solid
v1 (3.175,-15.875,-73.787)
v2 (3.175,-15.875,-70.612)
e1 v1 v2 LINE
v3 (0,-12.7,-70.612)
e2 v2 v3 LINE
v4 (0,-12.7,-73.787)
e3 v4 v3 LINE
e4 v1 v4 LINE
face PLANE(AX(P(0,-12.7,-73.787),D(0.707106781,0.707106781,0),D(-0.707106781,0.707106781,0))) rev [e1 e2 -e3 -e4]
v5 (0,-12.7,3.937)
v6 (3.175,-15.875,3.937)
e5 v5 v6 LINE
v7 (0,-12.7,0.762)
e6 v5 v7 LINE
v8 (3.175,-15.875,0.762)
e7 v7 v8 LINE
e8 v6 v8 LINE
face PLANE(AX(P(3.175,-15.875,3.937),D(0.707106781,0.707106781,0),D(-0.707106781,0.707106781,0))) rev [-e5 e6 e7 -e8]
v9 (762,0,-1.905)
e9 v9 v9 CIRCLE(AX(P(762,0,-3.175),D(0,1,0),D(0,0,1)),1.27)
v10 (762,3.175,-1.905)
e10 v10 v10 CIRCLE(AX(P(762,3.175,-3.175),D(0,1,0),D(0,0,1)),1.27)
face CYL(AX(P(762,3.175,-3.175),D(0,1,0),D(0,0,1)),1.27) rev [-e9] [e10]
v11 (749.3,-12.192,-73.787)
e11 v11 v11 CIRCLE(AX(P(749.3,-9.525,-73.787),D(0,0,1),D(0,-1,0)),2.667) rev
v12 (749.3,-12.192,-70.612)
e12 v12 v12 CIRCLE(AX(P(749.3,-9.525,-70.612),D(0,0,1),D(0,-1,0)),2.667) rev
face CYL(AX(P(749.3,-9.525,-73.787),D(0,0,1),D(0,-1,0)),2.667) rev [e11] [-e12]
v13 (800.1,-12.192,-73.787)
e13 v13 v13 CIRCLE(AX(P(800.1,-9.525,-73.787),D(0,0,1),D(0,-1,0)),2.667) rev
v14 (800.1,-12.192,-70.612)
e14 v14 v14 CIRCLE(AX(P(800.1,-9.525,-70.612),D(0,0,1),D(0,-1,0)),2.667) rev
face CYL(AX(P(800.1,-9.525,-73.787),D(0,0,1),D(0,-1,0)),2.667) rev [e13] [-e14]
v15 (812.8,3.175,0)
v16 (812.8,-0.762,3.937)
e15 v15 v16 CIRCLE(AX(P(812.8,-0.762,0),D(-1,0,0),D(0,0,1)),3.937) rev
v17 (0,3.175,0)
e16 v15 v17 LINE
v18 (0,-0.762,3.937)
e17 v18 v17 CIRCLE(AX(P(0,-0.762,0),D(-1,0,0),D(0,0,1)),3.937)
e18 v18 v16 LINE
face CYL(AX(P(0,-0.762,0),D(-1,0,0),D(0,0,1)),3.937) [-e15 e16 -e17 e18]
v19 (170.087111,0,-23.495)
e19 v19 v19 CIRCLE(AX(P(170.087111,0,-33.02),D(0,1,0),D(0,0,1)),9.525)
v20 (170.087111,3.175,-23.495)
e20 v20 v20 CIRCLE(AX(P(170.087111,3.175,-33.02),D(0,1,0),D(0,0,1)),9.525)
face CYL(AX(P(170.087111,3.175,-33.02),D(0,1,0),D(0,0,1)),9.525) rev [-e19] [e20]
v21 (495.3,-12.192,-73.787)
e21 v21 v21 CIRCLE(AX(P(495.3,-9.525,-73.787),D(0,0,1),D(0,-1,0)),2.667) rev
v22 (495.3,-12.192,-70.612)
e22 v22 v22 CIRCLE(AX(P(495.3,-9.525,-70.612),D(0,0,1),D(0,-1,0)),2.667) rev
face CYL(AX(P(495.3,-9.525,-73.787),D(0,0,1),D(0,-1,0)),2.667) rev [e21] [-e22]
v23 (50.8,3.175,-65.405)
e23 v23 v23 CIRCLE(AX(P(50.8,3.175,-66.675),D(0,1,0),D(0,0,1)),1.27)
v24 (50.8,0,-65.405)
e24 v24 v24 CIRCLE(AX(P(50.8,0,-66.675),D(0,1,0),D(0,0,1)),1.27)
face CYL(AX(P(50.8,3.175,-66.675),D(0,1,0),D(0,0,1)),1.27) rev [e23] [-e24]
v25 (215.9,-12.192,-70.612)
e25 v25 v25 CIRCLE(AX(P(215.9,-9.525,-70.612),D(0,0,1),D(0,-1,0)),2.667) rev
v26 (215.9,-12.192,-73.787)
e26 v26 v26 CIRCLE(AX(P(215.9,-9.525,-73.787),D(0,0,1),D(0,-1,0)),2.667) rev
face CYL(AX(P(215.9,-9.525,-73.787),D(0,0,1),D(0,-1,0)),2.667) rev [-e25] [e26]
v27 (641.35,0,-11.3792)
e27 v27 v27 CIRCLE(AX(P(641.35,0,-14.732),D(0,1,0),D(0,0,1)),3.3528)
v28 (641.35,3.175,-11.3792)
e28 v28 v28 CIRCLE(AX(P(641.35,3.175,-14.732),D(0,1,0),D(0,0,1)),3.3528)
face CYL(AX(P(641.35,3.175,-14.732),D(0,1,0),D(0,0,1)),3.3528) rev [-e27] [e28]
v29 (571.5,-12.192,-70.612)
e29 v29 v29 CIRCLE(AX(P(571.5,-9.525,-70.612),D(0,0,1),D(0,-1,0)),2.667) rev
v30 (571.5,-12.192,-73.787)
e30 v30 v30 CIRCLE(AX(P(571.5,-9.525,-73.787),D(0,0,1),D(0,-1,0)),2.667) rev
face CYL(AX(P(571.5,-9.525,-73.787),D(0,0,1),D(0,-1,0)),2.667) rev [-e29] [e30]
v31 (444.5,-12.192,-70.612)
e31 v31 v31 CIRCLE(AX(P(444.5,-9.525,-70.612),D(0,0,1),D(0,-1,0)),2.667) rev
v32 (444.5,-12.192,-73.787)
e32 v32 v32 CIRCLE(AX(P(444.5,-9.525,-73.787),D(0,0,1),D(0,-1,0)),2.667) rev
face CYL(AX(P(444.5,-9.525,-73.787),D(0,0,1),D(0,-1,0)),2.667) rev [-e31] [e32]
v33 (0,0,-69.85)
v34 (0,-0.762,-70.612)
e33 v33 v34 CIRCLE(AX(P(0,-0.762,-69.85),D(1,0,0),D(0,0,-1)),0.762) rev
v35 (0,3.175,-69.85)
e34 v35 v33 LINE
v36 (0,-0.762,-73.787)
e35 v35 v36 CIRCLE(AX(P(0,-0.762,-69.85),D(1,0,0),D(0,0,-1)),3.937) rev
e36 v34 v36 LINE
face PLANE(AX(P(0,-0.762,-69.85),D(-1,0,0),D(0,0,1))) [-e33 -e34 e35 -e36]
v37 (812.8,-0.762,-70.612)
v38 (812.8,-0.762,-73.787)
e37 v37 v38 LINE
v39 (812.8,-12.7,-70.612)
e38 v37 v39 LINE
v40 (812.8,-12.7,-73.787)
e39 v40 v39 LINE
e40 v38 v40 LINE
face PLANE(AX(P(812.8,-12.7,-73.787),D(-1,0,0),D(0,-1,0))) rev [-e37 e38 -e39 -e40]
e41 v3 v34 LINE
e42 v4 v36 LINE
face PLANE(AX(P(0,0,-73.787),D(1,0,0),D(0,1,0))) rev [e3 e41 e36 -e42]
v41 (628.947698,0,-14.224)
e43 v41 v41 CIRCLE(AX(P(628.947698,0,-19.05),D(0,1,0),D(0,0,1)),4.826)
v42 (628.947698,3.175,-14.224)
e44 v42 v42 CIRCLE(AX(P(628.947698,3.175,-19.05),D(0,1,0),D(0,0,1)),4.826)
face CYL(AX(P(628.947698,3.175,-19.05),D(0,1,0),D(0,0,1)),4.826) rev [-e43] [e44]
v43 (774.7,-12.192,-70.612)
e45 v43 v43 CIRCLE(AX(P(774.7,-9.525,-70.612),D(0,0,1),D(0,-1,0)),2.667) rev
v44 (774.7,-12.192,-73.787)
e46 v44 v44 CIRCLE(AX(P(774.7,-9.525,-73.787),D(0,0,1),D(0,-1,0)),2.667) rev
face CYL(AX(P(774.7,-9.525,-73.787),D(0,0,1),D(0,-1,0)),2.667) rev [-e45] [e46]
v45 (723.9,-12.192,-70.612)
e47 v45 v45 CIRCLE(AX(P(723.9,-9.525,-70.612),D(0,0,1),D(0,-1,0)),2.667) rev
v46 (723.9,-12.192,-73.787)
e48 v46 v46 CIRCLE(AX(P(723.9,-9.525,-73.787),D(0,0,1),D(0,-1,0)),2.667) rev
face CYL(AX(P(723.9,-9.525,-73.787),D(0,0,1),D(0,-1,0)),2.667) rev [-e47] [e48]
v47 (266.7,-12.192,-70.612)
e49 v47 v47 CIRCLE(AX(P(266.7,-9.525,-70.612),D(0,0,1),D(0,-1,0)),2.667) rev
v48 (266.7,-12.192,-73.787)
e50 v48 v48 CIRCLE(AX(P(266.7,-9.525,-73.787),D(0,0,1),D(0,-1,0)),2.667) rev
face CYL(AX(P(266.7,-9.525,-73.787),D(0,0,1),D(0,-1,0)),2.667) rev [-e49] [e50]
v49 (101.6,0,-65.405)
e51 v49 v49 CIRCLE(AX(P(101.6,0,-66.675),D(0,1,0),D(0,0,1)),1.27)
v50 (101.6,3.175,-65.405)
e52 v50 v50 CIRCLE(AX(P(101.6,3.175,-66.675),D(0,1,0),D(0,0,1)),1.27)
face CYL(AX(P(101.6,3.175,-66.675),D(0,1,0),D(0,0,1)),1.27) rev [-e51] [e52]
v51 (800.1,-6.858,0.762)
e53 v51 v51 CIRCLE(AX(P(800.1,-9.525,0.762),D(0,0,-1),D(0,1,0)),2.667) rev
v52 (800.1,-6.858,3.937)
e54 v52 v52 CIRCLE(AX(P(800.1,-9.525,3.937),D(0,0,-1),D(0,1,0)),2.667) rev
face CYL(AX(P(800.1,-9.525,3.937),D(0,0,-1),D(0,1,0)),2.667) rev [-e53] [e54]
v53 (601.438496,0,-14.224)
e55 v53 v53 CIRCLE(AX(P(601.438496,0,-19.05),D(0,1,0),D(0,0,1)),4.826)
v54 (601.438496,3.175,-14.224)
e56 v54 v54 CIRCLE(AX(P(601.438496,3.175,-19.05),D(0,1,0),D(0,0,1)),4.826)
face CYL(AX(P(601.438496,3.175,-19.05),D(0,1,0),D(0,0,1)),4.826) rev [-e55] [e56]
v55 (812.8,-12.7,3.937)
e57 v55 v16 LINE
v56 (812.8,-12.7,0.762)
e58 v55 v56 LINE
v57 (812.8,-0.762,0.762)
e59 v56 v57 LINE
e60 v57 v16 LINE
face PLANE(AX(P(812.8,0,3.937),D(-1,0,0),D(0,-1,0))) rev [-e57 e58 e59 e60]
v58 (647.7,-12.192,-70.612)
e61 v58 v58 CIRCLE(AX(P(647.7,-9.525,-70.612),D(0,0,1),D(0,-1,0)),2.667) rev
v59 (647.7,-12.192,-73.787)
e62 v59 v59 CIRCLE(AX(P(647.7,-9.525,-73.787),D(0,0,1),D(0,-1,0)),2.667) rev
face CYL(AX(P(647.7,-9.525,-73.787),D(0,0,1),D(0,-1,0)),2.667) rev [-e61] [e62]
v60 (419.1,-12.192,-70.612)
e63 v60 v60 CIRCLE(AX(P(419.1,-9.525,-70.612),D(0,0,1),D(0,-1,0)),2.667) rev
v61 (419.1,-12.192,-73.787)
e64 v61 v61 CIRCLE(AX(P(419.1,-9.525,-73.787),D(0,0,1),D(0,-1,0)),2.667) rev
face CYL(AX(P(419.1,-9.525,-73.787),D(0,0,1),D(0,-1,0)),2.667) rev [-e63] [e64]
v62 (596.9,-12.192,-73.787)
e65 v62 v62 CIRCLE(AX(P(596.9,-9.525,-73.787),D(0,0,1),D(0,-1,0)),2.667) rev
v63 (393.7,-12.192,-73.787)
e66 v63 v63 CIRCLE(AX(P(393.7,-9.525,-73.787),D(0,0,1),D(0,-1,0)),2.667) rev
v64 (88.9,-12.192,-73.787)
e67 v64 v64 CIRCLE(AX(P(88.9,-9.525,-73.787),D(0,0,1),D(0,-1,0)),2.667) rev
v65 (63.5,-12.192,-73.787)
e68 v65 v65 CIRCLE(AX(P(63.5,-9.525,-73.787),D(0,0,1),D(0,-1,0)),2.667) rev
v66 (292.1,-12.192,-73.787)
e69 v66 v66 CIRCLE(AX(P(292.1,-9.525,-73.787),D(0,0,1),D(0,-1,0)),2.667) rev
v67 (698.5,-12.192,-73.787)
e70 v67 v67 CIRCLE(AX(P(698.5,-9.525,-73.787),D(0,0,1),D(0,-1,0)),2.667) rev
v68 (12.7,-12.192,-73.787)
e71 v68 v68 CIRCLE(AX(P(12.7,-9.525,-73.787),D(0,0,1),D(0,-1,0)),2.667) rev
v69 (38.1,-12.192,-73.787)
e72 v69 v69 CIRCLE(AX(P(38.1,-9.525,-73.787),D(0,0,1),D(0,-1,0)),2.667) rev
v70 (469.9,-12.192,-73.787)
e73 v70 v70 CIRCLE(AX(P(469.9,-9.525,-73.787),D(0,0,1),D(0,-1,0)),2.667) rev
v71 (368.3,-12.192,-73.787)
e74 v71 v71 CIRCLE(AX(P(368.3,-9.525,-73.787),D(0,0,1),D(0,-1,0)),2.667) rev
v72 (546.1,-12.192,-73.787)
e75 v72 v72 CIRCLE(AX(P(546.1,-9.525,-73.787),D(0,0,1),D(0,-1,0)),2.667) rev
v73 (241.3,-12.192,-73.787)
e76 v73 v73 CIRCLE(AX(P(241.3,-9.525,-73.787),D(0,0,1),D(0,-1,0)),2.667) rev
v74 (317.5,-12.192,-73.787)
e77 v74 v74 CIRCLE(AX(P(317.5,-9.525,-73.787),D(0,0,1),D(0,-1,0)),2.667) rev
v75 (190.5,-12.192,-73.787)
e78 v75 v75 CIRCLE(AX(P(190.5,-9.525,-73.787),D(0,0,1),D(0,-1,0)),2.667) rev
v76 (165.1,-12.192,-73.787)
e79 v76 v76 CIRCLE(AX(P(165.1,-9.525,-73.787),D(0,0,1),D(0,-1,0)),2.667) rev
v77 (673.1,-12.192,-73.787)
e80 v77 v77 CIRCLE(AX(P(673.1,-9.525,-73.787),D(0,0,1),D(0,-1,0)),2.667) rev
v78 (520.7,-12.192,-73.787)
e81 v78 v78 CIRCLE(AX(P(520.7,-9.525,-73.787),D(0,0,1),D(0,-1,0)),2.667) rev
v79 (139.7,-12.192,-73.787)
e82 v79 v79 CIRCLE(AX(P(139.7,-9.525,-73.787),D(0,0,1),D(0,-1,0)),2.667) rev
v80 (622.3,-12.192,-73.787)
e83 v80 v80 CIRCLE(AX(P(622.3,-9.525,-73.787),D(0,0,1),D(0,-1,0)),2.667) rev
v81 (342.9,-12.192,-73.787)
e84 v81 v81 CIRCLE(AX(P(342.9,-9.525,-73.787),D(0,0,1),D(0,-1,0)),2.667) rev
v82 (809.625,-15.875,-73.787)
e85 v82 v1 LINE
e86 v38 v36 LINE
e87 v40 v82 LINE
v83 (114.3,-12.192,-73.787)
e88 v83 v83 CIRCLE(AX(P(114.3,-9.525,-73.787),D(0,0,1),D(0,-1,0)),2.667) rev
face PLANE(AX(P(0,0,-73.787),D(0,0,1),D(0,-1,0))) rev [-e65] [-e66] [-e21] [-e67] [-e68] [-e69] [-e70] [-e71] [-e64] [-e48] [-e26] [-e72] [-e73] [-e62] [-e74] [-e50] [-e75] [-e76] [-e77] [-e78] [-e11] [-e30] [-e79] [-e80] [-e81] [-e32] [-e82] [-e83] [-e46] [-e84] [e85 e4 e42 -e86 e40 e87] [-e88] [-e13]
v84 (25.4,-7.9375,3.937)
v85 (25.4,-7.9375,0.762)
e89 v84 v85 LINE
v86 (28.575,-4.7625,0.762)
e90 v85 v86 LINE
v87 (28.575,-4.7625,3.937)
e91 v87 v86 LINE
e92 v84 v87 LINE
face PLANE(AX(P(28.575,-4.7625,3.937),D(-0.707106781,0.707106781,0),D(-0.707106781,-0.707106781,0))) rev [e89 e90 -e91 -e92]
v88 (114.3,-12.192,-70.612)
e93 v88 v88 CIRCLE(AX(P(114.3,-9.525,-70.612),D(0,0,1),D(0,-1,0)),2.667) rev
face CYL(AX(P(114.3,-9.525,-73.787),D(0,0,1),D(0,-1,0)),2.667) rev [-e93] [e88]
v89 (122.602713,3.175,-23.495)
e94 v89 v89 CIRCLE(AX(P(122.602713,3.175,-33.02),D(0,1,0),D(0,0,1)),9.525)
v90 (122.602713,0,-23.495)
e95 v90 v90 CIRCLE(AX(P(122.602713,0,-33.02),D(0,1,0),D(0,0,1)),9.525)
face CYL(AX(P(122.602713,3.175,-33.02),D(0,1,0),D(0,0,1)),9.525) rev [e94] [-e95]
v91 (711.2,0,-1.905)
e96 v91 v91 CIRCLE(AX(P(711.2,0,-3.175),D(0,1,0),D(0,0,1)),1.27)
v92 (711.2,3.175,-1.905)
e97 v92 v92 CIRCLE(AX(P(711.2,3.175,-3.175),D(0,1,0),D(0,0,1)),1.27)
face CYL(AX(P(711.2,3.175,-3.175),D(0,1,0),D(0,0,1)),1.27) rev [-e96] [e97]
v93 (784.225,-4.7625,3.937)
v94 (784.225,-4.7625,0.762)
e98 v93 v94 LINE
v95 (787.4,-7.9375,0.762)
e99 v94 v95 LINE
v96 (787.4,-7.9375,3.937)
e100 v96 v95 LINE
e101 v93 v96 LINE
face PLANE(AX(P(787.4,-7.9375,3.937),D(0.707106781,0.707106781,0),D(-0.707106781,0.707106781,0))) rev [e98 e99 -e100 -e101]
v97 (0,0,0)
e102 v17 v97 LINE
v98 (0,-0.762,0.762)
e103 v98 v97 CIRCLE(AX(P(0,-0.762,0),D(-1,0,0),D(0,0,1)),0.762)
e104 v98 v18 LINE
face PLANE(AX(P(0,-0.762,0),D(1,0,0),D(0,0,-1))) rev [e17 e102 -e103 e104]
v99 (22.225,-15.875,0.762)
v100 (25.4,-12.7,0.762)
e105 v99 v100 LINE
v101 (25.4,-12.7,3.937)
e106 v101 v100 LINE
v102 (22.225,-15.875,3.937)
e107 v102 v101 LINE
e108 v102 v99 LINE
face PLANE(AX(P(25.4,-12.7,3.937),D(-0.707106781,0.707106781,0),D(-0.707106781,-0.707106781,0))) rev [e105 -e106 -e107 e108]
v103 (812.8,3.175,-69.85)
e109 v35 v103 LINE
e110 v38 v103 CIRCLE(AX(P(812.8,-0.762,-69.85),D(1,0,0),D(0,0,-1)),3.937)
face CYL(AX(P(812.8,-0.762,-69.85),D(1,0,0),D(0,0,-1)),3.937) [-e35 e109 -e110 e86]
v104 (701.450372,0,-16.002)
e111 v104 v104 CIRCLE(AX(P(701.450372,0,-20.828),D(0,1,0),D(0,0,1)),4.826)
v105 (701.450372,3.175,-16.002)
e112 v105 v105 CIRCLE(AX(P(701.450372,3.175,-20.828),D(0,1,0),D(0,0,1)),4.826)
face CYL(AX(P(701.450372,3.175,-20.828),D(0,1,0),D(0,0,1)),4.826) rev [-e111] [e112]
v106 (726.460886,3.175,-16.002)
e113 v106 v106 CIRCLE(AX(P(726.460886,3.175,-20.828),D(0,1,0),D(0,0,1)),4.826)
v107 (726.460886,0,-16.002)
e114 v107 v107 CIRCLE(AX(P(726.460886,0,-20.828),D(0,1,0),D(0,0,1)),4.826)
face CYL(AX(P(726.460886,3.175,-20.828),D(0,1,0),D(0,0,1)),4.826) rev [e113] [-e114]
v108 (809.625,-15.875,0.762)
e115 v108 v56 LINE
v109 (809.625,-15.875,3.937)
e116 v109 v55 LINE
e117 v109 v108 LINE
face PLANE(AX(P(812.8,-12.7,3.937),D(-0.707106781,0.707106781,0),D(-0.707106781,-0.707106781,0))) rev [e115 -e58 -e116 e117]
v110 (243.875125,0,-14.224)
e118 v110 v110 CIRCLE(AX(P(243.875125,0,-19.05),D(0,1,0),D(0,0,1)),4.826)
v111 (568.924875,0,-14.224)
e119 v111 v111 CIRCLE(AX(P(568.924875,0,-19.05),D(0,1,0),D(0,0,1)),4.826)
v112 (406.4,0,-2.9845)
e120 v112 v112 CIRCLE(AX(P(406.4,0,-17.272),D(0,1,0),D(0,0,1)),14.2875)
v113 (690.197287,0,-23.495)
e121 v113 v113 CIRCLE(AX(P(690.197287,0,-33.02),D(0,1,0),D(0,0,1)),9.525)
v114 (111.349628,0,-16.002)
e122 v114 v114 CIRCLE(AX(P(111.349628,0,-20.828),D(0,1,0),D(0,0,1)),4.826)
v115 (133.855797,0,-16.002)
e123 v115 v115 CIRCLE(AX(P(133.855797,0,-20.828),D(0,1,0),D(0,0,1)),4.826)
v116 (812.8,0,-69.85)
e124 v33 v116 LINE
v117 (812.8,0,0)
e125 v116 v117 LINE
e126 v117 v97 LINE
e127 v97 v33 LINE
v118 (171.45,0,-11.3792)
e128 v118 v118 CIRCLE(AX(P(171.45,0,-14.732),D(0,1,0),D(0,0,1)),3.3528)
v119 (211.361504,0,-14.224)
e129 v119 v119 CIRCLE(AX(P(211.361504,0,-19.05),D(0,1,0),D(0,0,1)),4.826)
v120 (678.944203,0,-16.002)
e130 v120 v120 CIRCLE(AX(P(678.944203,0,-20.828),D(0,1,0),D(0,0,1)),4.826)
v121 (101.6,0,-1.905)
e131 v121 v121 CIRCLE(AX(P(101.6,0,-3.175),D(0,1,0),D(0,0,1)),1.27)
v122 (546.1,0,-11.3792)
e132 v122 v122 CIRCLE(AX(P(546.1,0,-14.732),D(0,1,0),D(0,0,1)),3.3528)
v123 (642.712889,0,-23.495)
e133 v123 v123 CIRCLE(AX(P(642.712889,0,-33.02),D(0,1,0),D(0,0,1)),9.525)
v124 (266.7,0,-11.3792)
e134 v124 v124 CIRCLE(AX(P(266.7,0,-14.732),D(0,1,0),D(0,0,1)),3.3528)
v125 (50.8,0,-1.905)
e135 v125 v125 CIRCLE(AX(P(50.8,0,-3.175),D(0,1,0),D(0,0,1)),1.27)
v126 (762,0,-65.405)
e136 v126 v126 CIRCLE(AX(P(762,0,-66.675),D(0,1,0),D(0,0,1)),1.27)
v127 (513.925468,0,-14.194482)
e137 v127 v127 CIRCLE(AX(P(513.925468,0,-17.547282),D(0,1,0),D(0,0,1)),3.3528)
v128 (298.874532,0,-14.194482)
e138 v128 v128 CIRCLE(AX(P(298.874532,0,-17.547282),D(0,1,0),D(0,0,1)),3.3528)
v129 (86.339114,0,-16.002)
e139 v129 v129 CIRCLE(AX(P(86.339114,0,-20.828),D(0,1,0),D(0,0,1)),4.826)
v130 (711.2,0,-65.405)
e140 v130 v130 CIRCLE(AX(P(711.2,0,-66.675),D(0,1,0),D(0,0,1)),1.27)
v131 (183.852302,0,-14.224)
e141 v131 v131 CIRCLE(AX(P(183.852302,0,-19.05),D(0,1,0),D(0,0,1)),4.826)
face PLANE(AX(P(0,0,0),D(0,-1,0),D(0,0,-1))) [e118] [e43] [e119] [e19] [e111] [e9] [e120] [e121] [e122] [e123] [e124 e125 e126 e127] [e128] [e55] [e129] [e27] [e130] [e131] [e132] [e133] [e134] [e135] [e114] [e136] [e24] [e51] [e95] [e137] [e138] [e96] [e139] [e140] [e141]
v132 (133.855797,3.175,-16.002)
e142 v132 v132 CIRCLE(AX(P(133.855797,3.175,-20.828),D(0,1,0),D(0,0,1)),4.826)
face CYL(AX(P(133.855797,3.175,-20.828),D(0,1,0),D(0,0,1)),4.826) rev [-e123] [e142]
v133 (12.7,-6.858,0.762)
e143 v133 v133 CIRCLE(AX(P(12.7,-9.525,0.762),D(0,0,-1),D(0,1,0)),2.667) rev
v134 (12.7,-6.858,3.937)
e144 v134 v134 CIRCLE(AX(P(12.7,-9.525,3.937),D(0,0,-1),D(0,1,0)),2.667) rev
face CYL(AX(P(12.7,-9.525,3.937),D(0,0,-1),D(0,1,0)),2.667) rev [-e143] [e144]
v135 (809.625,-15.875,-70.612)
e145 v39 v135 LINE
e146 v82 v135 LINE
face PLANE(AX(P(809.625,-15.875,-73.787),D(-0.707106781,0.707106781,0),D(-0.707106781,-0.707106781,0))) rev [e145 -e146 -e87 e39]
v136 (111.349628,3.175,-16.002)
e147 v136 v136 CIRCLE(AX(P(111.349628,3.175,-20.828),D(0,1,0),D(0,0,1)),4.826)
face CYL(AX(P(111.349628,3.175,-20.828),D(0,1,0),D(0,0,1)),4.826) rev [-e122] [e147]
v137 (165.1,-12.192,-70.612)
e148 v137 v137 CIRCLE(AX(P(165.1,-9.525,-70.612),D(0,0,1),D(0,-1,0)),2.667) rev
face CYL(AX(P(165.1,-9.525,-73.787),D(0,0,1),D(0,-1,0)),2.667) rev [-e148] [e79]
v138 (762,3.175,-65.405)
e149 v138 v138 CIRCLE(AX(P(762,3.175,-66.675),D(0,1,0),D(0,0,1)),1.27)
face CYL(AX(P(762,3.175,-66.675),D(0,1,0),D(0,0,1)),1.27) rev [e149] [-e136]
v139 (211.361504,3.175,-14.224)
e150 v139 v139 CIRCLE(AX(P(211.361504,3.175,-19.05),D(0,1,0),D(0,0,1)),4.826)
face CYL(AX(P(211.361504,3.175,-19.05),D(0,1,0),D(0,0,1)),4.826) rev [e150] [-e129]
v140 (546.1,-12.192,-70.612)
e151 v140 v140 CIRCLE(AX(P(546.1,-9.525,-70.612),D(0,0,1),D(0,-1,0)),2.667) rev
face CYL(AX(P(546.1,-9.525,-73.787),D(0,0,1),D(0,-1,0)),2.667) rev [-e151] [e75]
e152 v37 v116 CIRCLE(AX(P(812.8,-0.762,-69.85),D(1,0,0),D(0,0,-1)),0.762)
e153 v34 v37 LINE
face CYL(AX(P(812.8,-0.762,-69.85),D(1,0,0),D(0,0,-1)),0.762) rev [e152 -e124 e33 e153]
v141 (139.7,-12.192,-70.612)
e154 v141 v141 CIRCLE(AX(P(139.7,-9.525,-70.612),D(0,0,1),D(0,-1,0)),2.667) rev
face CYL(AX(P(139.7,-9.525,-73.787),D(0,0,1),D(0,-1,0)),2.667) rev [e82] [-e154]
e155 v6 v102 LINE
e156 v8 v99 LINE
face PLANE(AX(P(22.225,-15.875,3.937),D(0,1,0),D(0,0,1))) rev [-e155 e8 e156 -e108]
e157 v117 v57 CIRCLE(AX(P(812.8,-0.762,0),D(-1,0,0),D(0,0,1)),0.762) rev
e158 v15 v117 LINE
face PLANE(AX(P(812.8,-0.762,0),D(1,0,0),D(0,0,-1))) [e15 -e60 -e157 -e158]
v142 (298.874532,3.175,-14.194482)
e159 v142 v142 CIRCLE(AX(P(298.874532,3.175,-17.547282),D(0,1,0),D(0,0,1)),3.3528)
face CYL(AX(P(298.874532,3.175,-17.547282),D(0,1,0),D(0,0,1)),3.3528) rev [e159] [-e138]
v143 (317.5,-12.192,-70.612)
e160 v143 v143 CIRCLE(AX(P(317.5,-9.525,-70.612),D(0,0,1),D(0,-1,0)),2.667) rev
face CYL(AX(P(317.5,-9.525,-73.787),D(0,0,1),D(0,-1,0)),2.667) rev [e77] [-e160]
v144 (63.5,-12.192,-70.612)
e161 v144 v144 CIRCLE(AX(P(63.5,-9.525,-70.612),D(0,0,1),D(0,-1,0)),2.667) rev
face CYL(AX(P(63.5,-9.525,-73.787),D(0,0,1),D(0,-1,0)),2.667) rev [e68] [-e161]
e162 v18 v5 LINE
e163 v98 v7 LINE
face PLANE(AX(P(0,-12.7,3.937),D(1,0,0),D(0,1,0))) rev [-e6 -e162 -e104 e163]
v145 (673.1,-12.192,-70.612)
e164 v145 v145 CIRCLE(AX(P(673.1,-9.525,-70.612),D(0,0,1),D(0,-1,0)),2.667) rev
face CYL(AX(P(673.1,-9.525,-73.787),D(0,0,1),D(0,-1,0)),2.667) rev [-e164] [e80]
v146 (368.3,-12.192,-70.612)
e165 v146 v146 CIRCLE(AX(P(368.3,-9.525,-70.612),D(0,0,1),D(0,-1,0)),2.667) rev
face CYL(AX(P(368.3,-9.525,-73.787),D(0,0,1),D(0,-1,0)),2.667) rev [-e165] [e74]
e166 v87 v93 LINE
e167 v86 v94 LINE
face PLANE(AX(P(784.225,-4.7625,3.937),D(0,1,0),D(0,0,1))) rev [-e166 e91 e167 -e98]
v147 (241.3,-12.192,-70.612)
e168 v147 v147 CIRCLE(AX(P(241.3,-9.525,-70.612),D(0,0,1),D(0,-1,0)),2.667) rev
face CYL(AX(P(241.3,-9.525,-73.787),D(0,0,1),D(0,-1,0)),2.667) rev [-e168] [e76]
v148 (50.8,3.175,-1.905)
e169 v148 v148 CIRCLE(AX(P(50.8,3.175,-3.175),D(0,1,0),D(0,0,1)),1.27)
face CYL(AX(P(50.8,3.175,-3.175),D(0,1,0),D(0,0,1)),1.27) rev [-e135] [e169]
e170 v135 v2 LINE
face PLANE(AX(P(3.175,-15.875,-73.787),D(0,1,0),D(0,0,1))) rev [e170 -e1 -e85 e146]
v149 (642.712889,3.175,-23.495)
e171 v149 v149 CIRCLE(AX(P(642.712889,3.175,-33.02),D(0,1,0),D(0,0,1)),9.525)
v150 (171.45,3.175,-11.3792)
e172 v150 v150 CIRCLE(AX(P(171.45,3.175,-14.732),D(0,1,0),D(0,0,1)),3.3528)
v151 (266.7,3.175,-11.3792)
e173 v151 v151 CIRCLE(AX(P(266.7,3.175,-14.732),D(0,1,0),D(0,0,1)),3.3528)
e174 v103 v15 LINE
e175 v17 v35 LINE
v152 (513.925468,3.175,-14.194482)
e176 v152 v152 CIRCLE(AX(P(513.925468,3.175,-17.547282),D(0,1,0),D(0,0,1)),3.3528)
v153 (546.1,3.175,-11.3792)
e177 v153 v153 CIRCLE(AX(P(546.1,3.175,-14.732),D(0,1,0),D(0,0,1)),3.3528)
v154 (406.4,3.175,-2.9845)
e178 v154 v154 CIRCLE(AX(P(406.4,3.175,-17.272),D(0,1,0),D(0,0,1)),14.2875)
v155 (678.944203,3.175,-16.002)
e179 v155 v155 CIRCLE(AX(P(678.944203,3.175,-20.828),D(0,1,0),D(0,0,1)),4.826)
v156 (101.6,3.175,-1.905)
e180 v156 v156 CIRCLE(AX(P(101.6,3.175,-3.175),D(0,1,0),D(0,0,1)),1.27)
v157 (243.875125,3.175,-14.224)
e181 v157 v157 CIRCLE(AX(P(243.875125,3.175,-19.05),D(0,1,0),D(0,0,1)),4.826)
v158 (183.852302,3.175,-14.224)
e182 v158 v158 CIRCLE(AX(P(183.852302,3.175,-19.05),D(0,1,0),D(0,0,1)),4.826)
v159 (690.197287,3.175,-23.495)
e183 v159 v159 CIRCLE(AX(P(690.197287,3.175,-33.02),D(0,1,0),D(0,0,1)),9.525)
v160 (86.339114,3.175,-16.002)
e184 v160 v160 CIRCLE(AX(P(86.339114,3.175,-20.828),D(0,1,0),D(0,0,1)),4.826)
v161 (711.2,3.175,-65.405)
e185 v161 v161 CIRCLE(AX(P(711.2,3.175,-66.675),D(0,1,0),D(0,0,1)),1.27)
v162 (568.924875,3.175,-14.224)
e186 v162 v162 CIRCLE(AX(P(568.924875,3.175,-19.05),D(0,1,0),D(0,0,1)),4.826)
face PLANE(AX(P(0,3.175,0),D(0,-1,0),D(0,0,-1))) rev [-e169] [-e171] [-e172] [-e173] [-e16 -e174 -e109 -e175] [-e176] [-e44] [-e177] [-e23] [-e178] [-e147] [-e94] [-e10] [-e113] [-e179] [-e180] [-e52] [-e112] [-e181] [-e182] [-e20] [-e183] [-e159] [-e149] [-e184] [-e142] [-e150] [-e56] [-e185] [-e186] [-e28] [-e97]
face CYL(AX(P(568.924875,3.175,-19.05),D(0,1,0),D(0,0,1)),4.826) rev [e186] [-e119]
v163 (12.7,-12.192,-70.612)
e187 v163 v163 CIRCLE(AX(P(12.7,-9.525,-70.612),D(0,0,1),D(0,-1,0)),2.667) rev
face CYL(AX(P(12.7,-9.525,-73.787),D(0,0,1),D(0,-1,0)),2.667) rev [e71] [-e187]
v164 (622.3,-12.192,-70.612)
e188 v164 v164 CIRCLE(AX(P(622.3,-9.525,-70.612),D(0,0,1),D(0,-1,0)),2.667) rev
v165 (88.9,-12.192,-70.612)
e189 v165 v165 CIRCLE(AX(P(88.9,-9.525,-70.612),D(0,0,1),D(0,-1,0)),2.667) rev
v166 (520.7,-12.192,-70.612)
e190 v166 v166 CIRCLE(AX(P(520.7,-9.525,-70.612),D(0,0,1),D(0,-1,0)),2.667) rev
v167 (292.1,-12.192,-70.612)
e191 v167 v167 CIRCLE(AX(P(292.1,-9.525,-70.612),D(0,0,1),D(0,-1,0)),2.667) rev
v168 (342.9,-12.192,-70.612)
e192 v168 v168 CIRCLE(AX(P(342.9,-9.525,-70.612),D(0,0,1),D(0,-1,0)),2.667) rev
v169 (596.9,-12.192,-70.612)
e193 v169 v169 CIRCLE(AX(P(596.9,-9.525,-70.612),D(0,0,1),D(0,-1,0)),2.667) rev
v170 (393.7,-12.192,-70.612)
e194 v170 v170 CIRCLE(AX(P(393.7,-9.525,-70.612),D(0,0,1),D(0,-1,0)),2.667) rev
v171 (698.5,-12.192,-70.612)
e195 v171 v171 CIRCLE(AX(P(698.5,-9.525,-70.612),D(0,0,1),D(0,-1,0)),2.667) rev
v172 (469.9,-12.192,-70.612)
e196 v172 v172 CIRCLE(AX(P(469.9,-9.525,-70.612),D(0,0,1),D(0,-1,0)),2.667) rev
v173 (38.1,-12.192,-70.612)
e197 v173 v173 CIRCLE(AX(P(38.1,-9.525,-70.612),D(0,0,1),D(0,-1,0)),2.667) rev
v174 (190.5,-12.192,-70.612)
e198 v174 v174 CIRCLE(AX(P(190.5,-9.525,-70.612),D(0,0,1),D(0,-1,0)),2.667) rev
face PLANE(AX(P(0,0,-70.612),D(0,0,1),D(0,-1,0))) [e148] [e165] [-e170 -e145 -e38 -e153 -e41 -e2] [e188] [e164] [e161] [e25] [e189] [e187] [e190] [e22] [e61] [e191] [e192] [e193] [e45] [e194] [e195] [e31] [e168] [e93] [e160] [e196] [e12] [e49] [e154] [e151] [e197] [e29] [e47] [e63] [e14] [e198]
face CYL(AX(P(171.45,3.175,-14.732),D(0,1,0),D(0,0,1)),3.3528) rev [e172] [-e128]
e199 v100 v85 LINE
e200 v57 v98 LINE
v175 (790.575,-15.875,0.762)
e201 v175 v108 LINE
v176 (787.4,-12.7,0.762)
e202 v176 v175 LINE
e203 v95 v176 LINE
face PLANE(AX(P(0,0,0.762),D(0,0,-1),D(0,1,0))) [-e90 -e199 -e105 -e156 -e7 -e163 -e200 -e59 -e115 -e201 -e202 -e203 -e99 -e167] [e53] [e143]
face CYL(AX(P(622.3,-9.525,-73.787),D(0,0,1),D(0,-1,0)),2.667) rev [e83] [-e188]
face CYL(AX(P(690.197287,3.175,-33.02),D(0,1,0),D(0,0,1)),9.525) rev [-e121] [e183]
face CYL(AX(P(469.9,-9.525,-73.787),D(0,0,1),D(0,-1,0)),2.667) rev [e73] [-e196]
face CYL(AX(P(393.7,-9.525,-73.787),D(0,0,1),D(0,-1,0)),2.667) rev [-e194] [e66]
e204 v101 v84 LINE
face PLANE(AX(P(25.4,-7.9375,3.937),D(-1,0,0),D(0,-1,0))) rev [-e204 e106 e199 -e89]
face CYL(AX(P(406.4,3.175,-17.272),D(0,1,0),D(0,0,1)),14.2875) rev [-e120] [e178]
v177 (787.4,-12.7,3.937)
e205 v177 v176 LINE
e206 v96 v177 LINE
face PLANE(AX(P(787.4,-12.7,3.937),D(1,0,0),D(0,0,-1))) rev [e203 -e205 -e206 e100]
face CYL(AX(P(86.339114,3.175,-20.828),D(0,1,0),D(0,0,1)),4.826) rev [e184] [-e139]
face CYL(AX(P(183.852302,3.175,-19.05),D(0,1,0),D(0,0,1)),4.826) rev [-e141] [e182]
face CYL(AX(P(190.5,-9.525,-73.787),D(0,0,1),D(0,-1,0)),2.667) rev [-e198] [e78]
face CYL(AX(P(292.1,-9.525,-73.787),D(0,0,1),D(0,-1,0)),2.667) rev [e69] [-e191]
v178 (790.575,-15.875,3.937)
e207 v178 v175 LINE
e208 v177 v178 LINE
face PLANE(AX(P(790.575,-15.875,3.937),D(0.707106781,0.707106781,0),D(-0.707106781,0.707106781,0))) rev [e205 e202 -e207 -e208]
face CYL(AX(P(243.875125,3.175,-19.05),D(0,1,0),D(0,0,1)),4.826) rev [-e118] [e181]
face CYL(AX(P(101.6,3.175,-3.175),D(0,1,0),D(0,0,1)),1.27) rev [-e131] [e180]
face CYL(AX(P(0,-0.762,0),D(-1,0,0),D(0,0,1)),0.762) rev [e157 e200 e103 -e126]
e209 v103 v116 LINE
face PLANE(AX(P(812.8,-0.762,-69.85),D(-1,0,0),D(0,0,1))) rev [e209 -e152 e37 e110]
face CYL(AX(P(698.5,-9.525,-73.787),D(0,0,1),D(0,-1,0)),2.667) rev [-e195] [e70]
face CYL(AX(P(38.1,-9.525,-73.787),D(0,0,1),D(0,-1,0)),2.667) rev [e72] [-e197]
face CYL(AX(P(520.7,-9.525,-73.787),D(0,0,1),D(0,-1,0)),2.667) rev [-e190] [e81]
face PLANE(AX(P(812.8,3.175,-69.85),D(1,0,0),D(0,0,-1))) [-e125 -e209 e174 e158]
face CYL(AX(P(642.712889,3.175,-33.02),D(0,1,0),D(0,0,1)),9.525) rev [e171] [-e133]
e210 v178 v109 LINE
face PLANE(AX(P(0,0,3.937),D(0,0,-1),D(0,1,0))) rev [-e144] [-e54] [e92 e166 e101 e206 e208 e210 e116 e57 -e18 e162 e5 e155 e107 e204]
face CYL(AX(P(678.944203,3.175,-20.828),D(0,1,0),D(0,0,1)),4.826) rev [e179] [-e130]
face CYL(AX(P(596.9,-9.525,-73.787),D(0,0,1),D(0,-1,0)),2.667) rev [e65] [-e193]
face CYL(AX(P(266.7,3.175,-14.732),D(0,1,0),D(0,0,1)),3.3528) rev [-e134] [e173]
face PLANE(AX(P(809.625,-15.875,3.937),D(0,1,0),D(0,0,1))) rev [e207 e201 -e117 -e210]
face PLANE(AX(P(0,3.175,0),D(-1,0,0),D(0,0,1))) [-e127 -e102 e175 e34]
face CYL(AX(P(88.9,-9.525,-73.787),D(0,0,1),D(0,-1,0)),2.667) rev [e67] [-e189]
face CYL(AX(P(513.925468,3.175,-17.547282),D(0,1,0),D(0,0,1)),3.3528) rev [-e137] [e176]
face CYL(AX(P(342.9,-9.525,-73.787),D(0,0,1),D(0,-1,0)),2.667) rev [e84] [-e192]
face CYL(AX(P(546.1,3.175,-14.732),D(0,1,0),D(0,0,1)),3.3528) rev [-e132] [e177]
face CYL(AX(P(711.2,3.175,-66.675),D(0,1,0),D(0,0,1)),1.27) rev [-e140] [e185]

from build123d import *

# Parameters (mm, degrees)
SKETCH11_W                  = 812.8
SKETCH11_H                  = 69.85
BOSS_EXTRUDE1_DEPTH         = 3.175
HOLE1_D                     = 28.575
HOLE2_D                     = 9.652
F_2_CLEARANCE_HOLE1_D       = 2.54
F_3_4_0_75_DIAMETER_HOLE1_D = 19.05
F_1_4_CLEARANCE_HOLE1_D     = 6.7056
EDGE_FLANGE1_DEPTH          = 812.8
EDGE_FLANGE1_START          = 3.175
EDGE_FLANGE1_PROFILE_R      = 2.667
EDGE_FLANGE1_FLAT_DEPTH     = 3.175
EDGE_FLANGE2_DEPTH          = 812.8
EDGE_FLANGE2_START          = 3.175
EDGE_FLANGE2_PROFILE_R      = 2.667
EDGE_FLANGE2_FLAT_DEPTH     = 3.175


# Sheet-metal steps are written as plain solids
with BuildPart() as part:
    # Sketch11 → Boss-Extrude1 (new body)
    with BuildSketch(Plane.XZ):
        with Locations((406.4, -34.925)):
            Rectangle(SKETCH11_W, SKETCH11_H)
    extrude(amount=-BOSS_EXTRUDE1_DEPTH)

    # Hole1 (through all)
    with Locations(Plane(origin=(0, 3.175, 0), x_dir=(1, 0, 0), z_dir=(0, 1, 0))):
        with Locations((406.4, 17.272)):
            Hole(HOLE1_D / 2)

    # Hole2 (through all)
    with Locations(Plane(origin=(0, 3.175, 0), x_dir=(1, 0, 0), z_dir=(0, 1, 0))):
        with Locations((568.924874752, 19.05), (601.438495912, 19.05), (628.947697627, 19.05), (243.875125248, 19.05), (211.361504088, 19.05), (183.852302373, 19.05), (678.944202666, 20.828), (701.450372003, 20.828), (726.460886343, 20.828), (133.855797334, 20.828), (111.349627997, 20.828), (86.339113657, 20.828)):
            Hole(HOLE2_D / 2)

    # #2 Clearance Hole1 (through all)
    with Locations(Plane(origin=(0, 3.175, 0), x_dir=(1, 0, 0), z_dir=(0, 1, 0))):
        with Locations((711.2, 3.175), (711.2, 66.675), (762, 3.175), (762, 66.675), (101.6, 3.175), (50.8, 3.175), (101.6, 66.675), (50.8, 66.675)):
            Hole(F_2_CLEARANCE_HOLE1_D / 2)

    # 3/4 (0.75) Diameter Hole1 (through all)
    with Locations(Plane(origin=(0, 3.175, 0), x_dir=(1, 0, 0), z_dir=(0, 1, 0))):
        with Locations((690.197287335, 33.02), (642.712889143, 33.02), (170.087110857, 33.02), (122.602712665, 33.02)):
            Hole(F_3_4_0_75_DIAMETER_HOLE1_D / 2)

    # 1/4 Clearance Hole1 (through all)
    with Locations(Plane(origin=(0, 3.175, 0), x_dir=(1, 0, 0), z_dir=(0, 1, 0))):
        with Locations((641.35, 14.732), (546.1, 14.732), (171.45, 14.732), (266.7, 14.732), (513.925467617, 17.547282407), (298.874532383, 17.547282407)):
            Hole(F_1_4_CLEARANCE_HOLE1_D / 2)

    # Edge-Flange1 bend section (across the edge) → Edge-Flange1 (add)
    with BuildSketch(Plane(origin=(812.8, 0, 0.762), x_dir=(0, 0, -1), z_dir=(-1, 0, 0))):
        with BuildLine():
            Line((-3.175, 0.762), (0, 0.762))
            ThreePointArc((0, 0.762), (0.223184633, 0.223184633), (0.762, 0))
            Line((0.762, 0), (0.762, -3.175))
            ThreePointArc((0.762, -3.175), (-2.021879398, -2.021879398), (-3.175, 0.762))
        make_face()
    extrude(amount=EDGE_FLANGE1_DEPTH)

    # Edge-Flange1 profile (on flange) → Edge-Flange1 flat (add)
    with BuildSketch(Plane(origin=(0, 0, 0.762), x_dir=(-1, 0, 0), z_dir=(0, 0, 1)).offset(EDGE_FLANGE1_START)):
        Polygon((0, 0.762), (0, 12.7), (-3.175, 15.875), (-22.225, 15.875), (-25.4, 12.7), (-25.4, 7.9375), (-28.575, 4.7625), (-784.225, 4.7625), (-787.4, 7.9375), (-787.4, 12.7), (-790.575, 15.875), (-809.625, 15.875), (-812.8, 12.7), (-812.8, 0.762), align=None)
        with Locations((-12.7, 9.525)):
            Circle(EDGE_FLANGE1_PROFILE_R, mode=Mode.SUBTRACT)
        with Locations((-800.1, 9.525)):
            Circle(EDGE_FLANGE1_PROFILE_R, mode=Mode.SUBTRACT)
    extrude(amount=-EDGE_FLANGE1_FLAT_DEPTH)

    # Edge-Flange2 bend section (across the edge) → Edge-Flange2 (add)
    with BuildSketch(Plane(origin=(0, 0, -70.612), x_dir=(0, 0, 1), z_dir=(1, 0, 0))):
        with BuildLine():
            Line((-3.175, 0.762), (0, 0.762))
            ThreePointArc((0, 0.762), (0.223184633, 0.223184633), (0.762, 0))
            Line((0.762, 0), (0.762, -3.175))
            ThreePointArc((0.762, -3.175), (-2.021879398, -2.021879398), (-3.175, 0.762))
        make_face()
    extrude(amount=EDGE_FLANGE2_DEPTH)

    # Edge-Flange2 profile (on flange) → Edge-Flange2 flat (add)
    with BuildSketch(Plane(origin=(0, 0, -70.612), x_dir=(1, 0, 0), z_dir=(0, 0, -1)).offset(EDGE_FLANGE2_START)):
        Polygon((0, 0.762), (812.8, 0.762), (812.8, 12.7), (809.625, 15.875), (3.175, 15.875), (0, 12.7), align=None)
        with Locations((393.7, 9.525)):
            Circle(EDGE_FLANGE2_PROFILE_R, mode=Mode.SUBTRACT)
        with Locations((368.3, 9.525)):
            Circle(EDGE_FLANGE2_PROFILE_R, mode=Mode.SUBTRACT)
        with Locations((342.9, 9.525)):
            Circle(EDGE_FLANGE2_PROFILE_R, mode=Mode.SUBTRACT)
        with Locations((317.5, 9.525)):
            Circle(EDGE_FLANGE2_PROFILE_R, mode=Mode.SUBTRACT)
        with Locations((292.1, 9.525)):
            Circle(EDGE_FLANGE2_PROFILE_R, mode=Mode.SUBTRACT)
        with Locations((266.7, 9.525)):
            Circle(EDGE_FLANGE2_PROFILE_R, mode=Mode.SUBTRACT)
        with Locations((241.3, 9.525)):
            Circle(EDGE_FLANGE2_PROFILE_R, mode=Mode.SUBTRACT)
        with Locations((215.9, 9.525)):
            Circle(EDGE_FLANGE2_PROFILE_R, mode=Mode.SUBTRACT)
        with Locations((190.5, 9.525)):
            Circle(EDGE_FLANGE2_PROFILE_R, mode=Mode.SUBTRACT)
        with Locations((165.1, 9.525)):
            Circle(EDGE_FLANGE2_PROFILE_R, mode=Mode.SUBTRACT)
        with Locations((139.7, 9.525)):
            Circle(EDGE_FLANGE2_PROFILE_R, mode=Mode.SUBTRACT)
        with Locations((114.3, 9.525)):
            Circle(EDGE_FLANGE2_PROFILE_R, mode=Mode.SUBTRACT)
        with Locations((88.9, 9.525)):
            Circle(EDGE_FLANGE2_PROFILE_R, mode=Mode.SUBTRACT)
        with Locations((63.5, 9.525)):
            Circle(EDGE_FLANGE2_PROFILE_R, mode=Mode.SUBTRACT)
        with Locations((38.1, 9.525)):
            Circle(EDGE_FLANGE2_PROFILE_R, mode=Mode.SUBTRACT)
        with Locations((12.7, 9.525)):
            Circle(EDGE_FLANGE2_PROFILE_R, mode=Mode.SUBTRACT)
        with Locations((800.1, 9.525)):
            Circle(EDGE_FLANGE2_PROFILE_R, mode=Mode.SUBTRACT)
        with Locations((774.7, 9.525)):
            Circle(EDGE_FLANGE2_PROFILE_R, mode=Mode.SUBTRACT)
        with Locations((749.3, 9.525)):
            Circle(EDGE_FLANGE2_PROFILE_R, mode=Mode.SUBTRACT)
        with Locations((723.9, 9.525)):
            Circle(EDGE_FLANGE2_PROFILE_R, mode=Mode.SUBTRACT)
        with Locations((698.5, 9.525)):
            Circle(EDGE_FLANGE2_PROFILE_R, mode=Mode.SUBTRACT)
        with Locations((673.1, 9.525)):
            Circle(EDGE_FLANGE2_PROFILE_R, mode=Mode.SUBTRACT)
        with Locations((647.7, 9.525)):
            Circle(EDGE_FLANGE2_PROFILE_R, mode=Mode.SUBTRACT)
        with Locations((622.3, 9.525)):
            Circle(EDGE_FLANGE2_PROFILE_R, mode=Mode.SUBTRACT)
        with Locations((596.9, 9.525)):
            Circle(EDGE_FLANGE2_PROFILE_R, mode=Mode.SUBTRACT)
        with Locations((571.5, 9.525)):
            Circle(EDGE_FLANGE2_PROFILE_R, mode=Mode.SUBTRACT)
        with Locations((546.1, 9.525)):
            Circle(EDGE_FLANGE2_PROFILE_R, mode=Mode.SUBTRACT)
        with Locations((520.7, 9.525)):
            Circle(EDGE_FLANGE2_PROFILE_R, mode=Mode.SUBTRACT)
        with Locations((495.3, 9.525)):
            Circle(EDGE_FLANGE2_PROFILE_R, mode=Mode.SUBTRACT)
        with Locations((469.9, 9.525)):
            Circle(EDGE_FLANGE2_PROFILE_R, mode=Mode.SUBTRACT)
        with Locations((444.5, 9.525)):
            Circle(EDGE_FLANGE2_PROFILE_R, mode=Mode.SUBTRACT)
        with Locations((419.1, 9.525)):
            Circle(EDGE_FLANGE2_PROFILE_R, mode=Mode.SUBTRACT)
    extrude(amount=-EDGE_FLANGE2_FLAT_DEPTH)


solid = part.part
